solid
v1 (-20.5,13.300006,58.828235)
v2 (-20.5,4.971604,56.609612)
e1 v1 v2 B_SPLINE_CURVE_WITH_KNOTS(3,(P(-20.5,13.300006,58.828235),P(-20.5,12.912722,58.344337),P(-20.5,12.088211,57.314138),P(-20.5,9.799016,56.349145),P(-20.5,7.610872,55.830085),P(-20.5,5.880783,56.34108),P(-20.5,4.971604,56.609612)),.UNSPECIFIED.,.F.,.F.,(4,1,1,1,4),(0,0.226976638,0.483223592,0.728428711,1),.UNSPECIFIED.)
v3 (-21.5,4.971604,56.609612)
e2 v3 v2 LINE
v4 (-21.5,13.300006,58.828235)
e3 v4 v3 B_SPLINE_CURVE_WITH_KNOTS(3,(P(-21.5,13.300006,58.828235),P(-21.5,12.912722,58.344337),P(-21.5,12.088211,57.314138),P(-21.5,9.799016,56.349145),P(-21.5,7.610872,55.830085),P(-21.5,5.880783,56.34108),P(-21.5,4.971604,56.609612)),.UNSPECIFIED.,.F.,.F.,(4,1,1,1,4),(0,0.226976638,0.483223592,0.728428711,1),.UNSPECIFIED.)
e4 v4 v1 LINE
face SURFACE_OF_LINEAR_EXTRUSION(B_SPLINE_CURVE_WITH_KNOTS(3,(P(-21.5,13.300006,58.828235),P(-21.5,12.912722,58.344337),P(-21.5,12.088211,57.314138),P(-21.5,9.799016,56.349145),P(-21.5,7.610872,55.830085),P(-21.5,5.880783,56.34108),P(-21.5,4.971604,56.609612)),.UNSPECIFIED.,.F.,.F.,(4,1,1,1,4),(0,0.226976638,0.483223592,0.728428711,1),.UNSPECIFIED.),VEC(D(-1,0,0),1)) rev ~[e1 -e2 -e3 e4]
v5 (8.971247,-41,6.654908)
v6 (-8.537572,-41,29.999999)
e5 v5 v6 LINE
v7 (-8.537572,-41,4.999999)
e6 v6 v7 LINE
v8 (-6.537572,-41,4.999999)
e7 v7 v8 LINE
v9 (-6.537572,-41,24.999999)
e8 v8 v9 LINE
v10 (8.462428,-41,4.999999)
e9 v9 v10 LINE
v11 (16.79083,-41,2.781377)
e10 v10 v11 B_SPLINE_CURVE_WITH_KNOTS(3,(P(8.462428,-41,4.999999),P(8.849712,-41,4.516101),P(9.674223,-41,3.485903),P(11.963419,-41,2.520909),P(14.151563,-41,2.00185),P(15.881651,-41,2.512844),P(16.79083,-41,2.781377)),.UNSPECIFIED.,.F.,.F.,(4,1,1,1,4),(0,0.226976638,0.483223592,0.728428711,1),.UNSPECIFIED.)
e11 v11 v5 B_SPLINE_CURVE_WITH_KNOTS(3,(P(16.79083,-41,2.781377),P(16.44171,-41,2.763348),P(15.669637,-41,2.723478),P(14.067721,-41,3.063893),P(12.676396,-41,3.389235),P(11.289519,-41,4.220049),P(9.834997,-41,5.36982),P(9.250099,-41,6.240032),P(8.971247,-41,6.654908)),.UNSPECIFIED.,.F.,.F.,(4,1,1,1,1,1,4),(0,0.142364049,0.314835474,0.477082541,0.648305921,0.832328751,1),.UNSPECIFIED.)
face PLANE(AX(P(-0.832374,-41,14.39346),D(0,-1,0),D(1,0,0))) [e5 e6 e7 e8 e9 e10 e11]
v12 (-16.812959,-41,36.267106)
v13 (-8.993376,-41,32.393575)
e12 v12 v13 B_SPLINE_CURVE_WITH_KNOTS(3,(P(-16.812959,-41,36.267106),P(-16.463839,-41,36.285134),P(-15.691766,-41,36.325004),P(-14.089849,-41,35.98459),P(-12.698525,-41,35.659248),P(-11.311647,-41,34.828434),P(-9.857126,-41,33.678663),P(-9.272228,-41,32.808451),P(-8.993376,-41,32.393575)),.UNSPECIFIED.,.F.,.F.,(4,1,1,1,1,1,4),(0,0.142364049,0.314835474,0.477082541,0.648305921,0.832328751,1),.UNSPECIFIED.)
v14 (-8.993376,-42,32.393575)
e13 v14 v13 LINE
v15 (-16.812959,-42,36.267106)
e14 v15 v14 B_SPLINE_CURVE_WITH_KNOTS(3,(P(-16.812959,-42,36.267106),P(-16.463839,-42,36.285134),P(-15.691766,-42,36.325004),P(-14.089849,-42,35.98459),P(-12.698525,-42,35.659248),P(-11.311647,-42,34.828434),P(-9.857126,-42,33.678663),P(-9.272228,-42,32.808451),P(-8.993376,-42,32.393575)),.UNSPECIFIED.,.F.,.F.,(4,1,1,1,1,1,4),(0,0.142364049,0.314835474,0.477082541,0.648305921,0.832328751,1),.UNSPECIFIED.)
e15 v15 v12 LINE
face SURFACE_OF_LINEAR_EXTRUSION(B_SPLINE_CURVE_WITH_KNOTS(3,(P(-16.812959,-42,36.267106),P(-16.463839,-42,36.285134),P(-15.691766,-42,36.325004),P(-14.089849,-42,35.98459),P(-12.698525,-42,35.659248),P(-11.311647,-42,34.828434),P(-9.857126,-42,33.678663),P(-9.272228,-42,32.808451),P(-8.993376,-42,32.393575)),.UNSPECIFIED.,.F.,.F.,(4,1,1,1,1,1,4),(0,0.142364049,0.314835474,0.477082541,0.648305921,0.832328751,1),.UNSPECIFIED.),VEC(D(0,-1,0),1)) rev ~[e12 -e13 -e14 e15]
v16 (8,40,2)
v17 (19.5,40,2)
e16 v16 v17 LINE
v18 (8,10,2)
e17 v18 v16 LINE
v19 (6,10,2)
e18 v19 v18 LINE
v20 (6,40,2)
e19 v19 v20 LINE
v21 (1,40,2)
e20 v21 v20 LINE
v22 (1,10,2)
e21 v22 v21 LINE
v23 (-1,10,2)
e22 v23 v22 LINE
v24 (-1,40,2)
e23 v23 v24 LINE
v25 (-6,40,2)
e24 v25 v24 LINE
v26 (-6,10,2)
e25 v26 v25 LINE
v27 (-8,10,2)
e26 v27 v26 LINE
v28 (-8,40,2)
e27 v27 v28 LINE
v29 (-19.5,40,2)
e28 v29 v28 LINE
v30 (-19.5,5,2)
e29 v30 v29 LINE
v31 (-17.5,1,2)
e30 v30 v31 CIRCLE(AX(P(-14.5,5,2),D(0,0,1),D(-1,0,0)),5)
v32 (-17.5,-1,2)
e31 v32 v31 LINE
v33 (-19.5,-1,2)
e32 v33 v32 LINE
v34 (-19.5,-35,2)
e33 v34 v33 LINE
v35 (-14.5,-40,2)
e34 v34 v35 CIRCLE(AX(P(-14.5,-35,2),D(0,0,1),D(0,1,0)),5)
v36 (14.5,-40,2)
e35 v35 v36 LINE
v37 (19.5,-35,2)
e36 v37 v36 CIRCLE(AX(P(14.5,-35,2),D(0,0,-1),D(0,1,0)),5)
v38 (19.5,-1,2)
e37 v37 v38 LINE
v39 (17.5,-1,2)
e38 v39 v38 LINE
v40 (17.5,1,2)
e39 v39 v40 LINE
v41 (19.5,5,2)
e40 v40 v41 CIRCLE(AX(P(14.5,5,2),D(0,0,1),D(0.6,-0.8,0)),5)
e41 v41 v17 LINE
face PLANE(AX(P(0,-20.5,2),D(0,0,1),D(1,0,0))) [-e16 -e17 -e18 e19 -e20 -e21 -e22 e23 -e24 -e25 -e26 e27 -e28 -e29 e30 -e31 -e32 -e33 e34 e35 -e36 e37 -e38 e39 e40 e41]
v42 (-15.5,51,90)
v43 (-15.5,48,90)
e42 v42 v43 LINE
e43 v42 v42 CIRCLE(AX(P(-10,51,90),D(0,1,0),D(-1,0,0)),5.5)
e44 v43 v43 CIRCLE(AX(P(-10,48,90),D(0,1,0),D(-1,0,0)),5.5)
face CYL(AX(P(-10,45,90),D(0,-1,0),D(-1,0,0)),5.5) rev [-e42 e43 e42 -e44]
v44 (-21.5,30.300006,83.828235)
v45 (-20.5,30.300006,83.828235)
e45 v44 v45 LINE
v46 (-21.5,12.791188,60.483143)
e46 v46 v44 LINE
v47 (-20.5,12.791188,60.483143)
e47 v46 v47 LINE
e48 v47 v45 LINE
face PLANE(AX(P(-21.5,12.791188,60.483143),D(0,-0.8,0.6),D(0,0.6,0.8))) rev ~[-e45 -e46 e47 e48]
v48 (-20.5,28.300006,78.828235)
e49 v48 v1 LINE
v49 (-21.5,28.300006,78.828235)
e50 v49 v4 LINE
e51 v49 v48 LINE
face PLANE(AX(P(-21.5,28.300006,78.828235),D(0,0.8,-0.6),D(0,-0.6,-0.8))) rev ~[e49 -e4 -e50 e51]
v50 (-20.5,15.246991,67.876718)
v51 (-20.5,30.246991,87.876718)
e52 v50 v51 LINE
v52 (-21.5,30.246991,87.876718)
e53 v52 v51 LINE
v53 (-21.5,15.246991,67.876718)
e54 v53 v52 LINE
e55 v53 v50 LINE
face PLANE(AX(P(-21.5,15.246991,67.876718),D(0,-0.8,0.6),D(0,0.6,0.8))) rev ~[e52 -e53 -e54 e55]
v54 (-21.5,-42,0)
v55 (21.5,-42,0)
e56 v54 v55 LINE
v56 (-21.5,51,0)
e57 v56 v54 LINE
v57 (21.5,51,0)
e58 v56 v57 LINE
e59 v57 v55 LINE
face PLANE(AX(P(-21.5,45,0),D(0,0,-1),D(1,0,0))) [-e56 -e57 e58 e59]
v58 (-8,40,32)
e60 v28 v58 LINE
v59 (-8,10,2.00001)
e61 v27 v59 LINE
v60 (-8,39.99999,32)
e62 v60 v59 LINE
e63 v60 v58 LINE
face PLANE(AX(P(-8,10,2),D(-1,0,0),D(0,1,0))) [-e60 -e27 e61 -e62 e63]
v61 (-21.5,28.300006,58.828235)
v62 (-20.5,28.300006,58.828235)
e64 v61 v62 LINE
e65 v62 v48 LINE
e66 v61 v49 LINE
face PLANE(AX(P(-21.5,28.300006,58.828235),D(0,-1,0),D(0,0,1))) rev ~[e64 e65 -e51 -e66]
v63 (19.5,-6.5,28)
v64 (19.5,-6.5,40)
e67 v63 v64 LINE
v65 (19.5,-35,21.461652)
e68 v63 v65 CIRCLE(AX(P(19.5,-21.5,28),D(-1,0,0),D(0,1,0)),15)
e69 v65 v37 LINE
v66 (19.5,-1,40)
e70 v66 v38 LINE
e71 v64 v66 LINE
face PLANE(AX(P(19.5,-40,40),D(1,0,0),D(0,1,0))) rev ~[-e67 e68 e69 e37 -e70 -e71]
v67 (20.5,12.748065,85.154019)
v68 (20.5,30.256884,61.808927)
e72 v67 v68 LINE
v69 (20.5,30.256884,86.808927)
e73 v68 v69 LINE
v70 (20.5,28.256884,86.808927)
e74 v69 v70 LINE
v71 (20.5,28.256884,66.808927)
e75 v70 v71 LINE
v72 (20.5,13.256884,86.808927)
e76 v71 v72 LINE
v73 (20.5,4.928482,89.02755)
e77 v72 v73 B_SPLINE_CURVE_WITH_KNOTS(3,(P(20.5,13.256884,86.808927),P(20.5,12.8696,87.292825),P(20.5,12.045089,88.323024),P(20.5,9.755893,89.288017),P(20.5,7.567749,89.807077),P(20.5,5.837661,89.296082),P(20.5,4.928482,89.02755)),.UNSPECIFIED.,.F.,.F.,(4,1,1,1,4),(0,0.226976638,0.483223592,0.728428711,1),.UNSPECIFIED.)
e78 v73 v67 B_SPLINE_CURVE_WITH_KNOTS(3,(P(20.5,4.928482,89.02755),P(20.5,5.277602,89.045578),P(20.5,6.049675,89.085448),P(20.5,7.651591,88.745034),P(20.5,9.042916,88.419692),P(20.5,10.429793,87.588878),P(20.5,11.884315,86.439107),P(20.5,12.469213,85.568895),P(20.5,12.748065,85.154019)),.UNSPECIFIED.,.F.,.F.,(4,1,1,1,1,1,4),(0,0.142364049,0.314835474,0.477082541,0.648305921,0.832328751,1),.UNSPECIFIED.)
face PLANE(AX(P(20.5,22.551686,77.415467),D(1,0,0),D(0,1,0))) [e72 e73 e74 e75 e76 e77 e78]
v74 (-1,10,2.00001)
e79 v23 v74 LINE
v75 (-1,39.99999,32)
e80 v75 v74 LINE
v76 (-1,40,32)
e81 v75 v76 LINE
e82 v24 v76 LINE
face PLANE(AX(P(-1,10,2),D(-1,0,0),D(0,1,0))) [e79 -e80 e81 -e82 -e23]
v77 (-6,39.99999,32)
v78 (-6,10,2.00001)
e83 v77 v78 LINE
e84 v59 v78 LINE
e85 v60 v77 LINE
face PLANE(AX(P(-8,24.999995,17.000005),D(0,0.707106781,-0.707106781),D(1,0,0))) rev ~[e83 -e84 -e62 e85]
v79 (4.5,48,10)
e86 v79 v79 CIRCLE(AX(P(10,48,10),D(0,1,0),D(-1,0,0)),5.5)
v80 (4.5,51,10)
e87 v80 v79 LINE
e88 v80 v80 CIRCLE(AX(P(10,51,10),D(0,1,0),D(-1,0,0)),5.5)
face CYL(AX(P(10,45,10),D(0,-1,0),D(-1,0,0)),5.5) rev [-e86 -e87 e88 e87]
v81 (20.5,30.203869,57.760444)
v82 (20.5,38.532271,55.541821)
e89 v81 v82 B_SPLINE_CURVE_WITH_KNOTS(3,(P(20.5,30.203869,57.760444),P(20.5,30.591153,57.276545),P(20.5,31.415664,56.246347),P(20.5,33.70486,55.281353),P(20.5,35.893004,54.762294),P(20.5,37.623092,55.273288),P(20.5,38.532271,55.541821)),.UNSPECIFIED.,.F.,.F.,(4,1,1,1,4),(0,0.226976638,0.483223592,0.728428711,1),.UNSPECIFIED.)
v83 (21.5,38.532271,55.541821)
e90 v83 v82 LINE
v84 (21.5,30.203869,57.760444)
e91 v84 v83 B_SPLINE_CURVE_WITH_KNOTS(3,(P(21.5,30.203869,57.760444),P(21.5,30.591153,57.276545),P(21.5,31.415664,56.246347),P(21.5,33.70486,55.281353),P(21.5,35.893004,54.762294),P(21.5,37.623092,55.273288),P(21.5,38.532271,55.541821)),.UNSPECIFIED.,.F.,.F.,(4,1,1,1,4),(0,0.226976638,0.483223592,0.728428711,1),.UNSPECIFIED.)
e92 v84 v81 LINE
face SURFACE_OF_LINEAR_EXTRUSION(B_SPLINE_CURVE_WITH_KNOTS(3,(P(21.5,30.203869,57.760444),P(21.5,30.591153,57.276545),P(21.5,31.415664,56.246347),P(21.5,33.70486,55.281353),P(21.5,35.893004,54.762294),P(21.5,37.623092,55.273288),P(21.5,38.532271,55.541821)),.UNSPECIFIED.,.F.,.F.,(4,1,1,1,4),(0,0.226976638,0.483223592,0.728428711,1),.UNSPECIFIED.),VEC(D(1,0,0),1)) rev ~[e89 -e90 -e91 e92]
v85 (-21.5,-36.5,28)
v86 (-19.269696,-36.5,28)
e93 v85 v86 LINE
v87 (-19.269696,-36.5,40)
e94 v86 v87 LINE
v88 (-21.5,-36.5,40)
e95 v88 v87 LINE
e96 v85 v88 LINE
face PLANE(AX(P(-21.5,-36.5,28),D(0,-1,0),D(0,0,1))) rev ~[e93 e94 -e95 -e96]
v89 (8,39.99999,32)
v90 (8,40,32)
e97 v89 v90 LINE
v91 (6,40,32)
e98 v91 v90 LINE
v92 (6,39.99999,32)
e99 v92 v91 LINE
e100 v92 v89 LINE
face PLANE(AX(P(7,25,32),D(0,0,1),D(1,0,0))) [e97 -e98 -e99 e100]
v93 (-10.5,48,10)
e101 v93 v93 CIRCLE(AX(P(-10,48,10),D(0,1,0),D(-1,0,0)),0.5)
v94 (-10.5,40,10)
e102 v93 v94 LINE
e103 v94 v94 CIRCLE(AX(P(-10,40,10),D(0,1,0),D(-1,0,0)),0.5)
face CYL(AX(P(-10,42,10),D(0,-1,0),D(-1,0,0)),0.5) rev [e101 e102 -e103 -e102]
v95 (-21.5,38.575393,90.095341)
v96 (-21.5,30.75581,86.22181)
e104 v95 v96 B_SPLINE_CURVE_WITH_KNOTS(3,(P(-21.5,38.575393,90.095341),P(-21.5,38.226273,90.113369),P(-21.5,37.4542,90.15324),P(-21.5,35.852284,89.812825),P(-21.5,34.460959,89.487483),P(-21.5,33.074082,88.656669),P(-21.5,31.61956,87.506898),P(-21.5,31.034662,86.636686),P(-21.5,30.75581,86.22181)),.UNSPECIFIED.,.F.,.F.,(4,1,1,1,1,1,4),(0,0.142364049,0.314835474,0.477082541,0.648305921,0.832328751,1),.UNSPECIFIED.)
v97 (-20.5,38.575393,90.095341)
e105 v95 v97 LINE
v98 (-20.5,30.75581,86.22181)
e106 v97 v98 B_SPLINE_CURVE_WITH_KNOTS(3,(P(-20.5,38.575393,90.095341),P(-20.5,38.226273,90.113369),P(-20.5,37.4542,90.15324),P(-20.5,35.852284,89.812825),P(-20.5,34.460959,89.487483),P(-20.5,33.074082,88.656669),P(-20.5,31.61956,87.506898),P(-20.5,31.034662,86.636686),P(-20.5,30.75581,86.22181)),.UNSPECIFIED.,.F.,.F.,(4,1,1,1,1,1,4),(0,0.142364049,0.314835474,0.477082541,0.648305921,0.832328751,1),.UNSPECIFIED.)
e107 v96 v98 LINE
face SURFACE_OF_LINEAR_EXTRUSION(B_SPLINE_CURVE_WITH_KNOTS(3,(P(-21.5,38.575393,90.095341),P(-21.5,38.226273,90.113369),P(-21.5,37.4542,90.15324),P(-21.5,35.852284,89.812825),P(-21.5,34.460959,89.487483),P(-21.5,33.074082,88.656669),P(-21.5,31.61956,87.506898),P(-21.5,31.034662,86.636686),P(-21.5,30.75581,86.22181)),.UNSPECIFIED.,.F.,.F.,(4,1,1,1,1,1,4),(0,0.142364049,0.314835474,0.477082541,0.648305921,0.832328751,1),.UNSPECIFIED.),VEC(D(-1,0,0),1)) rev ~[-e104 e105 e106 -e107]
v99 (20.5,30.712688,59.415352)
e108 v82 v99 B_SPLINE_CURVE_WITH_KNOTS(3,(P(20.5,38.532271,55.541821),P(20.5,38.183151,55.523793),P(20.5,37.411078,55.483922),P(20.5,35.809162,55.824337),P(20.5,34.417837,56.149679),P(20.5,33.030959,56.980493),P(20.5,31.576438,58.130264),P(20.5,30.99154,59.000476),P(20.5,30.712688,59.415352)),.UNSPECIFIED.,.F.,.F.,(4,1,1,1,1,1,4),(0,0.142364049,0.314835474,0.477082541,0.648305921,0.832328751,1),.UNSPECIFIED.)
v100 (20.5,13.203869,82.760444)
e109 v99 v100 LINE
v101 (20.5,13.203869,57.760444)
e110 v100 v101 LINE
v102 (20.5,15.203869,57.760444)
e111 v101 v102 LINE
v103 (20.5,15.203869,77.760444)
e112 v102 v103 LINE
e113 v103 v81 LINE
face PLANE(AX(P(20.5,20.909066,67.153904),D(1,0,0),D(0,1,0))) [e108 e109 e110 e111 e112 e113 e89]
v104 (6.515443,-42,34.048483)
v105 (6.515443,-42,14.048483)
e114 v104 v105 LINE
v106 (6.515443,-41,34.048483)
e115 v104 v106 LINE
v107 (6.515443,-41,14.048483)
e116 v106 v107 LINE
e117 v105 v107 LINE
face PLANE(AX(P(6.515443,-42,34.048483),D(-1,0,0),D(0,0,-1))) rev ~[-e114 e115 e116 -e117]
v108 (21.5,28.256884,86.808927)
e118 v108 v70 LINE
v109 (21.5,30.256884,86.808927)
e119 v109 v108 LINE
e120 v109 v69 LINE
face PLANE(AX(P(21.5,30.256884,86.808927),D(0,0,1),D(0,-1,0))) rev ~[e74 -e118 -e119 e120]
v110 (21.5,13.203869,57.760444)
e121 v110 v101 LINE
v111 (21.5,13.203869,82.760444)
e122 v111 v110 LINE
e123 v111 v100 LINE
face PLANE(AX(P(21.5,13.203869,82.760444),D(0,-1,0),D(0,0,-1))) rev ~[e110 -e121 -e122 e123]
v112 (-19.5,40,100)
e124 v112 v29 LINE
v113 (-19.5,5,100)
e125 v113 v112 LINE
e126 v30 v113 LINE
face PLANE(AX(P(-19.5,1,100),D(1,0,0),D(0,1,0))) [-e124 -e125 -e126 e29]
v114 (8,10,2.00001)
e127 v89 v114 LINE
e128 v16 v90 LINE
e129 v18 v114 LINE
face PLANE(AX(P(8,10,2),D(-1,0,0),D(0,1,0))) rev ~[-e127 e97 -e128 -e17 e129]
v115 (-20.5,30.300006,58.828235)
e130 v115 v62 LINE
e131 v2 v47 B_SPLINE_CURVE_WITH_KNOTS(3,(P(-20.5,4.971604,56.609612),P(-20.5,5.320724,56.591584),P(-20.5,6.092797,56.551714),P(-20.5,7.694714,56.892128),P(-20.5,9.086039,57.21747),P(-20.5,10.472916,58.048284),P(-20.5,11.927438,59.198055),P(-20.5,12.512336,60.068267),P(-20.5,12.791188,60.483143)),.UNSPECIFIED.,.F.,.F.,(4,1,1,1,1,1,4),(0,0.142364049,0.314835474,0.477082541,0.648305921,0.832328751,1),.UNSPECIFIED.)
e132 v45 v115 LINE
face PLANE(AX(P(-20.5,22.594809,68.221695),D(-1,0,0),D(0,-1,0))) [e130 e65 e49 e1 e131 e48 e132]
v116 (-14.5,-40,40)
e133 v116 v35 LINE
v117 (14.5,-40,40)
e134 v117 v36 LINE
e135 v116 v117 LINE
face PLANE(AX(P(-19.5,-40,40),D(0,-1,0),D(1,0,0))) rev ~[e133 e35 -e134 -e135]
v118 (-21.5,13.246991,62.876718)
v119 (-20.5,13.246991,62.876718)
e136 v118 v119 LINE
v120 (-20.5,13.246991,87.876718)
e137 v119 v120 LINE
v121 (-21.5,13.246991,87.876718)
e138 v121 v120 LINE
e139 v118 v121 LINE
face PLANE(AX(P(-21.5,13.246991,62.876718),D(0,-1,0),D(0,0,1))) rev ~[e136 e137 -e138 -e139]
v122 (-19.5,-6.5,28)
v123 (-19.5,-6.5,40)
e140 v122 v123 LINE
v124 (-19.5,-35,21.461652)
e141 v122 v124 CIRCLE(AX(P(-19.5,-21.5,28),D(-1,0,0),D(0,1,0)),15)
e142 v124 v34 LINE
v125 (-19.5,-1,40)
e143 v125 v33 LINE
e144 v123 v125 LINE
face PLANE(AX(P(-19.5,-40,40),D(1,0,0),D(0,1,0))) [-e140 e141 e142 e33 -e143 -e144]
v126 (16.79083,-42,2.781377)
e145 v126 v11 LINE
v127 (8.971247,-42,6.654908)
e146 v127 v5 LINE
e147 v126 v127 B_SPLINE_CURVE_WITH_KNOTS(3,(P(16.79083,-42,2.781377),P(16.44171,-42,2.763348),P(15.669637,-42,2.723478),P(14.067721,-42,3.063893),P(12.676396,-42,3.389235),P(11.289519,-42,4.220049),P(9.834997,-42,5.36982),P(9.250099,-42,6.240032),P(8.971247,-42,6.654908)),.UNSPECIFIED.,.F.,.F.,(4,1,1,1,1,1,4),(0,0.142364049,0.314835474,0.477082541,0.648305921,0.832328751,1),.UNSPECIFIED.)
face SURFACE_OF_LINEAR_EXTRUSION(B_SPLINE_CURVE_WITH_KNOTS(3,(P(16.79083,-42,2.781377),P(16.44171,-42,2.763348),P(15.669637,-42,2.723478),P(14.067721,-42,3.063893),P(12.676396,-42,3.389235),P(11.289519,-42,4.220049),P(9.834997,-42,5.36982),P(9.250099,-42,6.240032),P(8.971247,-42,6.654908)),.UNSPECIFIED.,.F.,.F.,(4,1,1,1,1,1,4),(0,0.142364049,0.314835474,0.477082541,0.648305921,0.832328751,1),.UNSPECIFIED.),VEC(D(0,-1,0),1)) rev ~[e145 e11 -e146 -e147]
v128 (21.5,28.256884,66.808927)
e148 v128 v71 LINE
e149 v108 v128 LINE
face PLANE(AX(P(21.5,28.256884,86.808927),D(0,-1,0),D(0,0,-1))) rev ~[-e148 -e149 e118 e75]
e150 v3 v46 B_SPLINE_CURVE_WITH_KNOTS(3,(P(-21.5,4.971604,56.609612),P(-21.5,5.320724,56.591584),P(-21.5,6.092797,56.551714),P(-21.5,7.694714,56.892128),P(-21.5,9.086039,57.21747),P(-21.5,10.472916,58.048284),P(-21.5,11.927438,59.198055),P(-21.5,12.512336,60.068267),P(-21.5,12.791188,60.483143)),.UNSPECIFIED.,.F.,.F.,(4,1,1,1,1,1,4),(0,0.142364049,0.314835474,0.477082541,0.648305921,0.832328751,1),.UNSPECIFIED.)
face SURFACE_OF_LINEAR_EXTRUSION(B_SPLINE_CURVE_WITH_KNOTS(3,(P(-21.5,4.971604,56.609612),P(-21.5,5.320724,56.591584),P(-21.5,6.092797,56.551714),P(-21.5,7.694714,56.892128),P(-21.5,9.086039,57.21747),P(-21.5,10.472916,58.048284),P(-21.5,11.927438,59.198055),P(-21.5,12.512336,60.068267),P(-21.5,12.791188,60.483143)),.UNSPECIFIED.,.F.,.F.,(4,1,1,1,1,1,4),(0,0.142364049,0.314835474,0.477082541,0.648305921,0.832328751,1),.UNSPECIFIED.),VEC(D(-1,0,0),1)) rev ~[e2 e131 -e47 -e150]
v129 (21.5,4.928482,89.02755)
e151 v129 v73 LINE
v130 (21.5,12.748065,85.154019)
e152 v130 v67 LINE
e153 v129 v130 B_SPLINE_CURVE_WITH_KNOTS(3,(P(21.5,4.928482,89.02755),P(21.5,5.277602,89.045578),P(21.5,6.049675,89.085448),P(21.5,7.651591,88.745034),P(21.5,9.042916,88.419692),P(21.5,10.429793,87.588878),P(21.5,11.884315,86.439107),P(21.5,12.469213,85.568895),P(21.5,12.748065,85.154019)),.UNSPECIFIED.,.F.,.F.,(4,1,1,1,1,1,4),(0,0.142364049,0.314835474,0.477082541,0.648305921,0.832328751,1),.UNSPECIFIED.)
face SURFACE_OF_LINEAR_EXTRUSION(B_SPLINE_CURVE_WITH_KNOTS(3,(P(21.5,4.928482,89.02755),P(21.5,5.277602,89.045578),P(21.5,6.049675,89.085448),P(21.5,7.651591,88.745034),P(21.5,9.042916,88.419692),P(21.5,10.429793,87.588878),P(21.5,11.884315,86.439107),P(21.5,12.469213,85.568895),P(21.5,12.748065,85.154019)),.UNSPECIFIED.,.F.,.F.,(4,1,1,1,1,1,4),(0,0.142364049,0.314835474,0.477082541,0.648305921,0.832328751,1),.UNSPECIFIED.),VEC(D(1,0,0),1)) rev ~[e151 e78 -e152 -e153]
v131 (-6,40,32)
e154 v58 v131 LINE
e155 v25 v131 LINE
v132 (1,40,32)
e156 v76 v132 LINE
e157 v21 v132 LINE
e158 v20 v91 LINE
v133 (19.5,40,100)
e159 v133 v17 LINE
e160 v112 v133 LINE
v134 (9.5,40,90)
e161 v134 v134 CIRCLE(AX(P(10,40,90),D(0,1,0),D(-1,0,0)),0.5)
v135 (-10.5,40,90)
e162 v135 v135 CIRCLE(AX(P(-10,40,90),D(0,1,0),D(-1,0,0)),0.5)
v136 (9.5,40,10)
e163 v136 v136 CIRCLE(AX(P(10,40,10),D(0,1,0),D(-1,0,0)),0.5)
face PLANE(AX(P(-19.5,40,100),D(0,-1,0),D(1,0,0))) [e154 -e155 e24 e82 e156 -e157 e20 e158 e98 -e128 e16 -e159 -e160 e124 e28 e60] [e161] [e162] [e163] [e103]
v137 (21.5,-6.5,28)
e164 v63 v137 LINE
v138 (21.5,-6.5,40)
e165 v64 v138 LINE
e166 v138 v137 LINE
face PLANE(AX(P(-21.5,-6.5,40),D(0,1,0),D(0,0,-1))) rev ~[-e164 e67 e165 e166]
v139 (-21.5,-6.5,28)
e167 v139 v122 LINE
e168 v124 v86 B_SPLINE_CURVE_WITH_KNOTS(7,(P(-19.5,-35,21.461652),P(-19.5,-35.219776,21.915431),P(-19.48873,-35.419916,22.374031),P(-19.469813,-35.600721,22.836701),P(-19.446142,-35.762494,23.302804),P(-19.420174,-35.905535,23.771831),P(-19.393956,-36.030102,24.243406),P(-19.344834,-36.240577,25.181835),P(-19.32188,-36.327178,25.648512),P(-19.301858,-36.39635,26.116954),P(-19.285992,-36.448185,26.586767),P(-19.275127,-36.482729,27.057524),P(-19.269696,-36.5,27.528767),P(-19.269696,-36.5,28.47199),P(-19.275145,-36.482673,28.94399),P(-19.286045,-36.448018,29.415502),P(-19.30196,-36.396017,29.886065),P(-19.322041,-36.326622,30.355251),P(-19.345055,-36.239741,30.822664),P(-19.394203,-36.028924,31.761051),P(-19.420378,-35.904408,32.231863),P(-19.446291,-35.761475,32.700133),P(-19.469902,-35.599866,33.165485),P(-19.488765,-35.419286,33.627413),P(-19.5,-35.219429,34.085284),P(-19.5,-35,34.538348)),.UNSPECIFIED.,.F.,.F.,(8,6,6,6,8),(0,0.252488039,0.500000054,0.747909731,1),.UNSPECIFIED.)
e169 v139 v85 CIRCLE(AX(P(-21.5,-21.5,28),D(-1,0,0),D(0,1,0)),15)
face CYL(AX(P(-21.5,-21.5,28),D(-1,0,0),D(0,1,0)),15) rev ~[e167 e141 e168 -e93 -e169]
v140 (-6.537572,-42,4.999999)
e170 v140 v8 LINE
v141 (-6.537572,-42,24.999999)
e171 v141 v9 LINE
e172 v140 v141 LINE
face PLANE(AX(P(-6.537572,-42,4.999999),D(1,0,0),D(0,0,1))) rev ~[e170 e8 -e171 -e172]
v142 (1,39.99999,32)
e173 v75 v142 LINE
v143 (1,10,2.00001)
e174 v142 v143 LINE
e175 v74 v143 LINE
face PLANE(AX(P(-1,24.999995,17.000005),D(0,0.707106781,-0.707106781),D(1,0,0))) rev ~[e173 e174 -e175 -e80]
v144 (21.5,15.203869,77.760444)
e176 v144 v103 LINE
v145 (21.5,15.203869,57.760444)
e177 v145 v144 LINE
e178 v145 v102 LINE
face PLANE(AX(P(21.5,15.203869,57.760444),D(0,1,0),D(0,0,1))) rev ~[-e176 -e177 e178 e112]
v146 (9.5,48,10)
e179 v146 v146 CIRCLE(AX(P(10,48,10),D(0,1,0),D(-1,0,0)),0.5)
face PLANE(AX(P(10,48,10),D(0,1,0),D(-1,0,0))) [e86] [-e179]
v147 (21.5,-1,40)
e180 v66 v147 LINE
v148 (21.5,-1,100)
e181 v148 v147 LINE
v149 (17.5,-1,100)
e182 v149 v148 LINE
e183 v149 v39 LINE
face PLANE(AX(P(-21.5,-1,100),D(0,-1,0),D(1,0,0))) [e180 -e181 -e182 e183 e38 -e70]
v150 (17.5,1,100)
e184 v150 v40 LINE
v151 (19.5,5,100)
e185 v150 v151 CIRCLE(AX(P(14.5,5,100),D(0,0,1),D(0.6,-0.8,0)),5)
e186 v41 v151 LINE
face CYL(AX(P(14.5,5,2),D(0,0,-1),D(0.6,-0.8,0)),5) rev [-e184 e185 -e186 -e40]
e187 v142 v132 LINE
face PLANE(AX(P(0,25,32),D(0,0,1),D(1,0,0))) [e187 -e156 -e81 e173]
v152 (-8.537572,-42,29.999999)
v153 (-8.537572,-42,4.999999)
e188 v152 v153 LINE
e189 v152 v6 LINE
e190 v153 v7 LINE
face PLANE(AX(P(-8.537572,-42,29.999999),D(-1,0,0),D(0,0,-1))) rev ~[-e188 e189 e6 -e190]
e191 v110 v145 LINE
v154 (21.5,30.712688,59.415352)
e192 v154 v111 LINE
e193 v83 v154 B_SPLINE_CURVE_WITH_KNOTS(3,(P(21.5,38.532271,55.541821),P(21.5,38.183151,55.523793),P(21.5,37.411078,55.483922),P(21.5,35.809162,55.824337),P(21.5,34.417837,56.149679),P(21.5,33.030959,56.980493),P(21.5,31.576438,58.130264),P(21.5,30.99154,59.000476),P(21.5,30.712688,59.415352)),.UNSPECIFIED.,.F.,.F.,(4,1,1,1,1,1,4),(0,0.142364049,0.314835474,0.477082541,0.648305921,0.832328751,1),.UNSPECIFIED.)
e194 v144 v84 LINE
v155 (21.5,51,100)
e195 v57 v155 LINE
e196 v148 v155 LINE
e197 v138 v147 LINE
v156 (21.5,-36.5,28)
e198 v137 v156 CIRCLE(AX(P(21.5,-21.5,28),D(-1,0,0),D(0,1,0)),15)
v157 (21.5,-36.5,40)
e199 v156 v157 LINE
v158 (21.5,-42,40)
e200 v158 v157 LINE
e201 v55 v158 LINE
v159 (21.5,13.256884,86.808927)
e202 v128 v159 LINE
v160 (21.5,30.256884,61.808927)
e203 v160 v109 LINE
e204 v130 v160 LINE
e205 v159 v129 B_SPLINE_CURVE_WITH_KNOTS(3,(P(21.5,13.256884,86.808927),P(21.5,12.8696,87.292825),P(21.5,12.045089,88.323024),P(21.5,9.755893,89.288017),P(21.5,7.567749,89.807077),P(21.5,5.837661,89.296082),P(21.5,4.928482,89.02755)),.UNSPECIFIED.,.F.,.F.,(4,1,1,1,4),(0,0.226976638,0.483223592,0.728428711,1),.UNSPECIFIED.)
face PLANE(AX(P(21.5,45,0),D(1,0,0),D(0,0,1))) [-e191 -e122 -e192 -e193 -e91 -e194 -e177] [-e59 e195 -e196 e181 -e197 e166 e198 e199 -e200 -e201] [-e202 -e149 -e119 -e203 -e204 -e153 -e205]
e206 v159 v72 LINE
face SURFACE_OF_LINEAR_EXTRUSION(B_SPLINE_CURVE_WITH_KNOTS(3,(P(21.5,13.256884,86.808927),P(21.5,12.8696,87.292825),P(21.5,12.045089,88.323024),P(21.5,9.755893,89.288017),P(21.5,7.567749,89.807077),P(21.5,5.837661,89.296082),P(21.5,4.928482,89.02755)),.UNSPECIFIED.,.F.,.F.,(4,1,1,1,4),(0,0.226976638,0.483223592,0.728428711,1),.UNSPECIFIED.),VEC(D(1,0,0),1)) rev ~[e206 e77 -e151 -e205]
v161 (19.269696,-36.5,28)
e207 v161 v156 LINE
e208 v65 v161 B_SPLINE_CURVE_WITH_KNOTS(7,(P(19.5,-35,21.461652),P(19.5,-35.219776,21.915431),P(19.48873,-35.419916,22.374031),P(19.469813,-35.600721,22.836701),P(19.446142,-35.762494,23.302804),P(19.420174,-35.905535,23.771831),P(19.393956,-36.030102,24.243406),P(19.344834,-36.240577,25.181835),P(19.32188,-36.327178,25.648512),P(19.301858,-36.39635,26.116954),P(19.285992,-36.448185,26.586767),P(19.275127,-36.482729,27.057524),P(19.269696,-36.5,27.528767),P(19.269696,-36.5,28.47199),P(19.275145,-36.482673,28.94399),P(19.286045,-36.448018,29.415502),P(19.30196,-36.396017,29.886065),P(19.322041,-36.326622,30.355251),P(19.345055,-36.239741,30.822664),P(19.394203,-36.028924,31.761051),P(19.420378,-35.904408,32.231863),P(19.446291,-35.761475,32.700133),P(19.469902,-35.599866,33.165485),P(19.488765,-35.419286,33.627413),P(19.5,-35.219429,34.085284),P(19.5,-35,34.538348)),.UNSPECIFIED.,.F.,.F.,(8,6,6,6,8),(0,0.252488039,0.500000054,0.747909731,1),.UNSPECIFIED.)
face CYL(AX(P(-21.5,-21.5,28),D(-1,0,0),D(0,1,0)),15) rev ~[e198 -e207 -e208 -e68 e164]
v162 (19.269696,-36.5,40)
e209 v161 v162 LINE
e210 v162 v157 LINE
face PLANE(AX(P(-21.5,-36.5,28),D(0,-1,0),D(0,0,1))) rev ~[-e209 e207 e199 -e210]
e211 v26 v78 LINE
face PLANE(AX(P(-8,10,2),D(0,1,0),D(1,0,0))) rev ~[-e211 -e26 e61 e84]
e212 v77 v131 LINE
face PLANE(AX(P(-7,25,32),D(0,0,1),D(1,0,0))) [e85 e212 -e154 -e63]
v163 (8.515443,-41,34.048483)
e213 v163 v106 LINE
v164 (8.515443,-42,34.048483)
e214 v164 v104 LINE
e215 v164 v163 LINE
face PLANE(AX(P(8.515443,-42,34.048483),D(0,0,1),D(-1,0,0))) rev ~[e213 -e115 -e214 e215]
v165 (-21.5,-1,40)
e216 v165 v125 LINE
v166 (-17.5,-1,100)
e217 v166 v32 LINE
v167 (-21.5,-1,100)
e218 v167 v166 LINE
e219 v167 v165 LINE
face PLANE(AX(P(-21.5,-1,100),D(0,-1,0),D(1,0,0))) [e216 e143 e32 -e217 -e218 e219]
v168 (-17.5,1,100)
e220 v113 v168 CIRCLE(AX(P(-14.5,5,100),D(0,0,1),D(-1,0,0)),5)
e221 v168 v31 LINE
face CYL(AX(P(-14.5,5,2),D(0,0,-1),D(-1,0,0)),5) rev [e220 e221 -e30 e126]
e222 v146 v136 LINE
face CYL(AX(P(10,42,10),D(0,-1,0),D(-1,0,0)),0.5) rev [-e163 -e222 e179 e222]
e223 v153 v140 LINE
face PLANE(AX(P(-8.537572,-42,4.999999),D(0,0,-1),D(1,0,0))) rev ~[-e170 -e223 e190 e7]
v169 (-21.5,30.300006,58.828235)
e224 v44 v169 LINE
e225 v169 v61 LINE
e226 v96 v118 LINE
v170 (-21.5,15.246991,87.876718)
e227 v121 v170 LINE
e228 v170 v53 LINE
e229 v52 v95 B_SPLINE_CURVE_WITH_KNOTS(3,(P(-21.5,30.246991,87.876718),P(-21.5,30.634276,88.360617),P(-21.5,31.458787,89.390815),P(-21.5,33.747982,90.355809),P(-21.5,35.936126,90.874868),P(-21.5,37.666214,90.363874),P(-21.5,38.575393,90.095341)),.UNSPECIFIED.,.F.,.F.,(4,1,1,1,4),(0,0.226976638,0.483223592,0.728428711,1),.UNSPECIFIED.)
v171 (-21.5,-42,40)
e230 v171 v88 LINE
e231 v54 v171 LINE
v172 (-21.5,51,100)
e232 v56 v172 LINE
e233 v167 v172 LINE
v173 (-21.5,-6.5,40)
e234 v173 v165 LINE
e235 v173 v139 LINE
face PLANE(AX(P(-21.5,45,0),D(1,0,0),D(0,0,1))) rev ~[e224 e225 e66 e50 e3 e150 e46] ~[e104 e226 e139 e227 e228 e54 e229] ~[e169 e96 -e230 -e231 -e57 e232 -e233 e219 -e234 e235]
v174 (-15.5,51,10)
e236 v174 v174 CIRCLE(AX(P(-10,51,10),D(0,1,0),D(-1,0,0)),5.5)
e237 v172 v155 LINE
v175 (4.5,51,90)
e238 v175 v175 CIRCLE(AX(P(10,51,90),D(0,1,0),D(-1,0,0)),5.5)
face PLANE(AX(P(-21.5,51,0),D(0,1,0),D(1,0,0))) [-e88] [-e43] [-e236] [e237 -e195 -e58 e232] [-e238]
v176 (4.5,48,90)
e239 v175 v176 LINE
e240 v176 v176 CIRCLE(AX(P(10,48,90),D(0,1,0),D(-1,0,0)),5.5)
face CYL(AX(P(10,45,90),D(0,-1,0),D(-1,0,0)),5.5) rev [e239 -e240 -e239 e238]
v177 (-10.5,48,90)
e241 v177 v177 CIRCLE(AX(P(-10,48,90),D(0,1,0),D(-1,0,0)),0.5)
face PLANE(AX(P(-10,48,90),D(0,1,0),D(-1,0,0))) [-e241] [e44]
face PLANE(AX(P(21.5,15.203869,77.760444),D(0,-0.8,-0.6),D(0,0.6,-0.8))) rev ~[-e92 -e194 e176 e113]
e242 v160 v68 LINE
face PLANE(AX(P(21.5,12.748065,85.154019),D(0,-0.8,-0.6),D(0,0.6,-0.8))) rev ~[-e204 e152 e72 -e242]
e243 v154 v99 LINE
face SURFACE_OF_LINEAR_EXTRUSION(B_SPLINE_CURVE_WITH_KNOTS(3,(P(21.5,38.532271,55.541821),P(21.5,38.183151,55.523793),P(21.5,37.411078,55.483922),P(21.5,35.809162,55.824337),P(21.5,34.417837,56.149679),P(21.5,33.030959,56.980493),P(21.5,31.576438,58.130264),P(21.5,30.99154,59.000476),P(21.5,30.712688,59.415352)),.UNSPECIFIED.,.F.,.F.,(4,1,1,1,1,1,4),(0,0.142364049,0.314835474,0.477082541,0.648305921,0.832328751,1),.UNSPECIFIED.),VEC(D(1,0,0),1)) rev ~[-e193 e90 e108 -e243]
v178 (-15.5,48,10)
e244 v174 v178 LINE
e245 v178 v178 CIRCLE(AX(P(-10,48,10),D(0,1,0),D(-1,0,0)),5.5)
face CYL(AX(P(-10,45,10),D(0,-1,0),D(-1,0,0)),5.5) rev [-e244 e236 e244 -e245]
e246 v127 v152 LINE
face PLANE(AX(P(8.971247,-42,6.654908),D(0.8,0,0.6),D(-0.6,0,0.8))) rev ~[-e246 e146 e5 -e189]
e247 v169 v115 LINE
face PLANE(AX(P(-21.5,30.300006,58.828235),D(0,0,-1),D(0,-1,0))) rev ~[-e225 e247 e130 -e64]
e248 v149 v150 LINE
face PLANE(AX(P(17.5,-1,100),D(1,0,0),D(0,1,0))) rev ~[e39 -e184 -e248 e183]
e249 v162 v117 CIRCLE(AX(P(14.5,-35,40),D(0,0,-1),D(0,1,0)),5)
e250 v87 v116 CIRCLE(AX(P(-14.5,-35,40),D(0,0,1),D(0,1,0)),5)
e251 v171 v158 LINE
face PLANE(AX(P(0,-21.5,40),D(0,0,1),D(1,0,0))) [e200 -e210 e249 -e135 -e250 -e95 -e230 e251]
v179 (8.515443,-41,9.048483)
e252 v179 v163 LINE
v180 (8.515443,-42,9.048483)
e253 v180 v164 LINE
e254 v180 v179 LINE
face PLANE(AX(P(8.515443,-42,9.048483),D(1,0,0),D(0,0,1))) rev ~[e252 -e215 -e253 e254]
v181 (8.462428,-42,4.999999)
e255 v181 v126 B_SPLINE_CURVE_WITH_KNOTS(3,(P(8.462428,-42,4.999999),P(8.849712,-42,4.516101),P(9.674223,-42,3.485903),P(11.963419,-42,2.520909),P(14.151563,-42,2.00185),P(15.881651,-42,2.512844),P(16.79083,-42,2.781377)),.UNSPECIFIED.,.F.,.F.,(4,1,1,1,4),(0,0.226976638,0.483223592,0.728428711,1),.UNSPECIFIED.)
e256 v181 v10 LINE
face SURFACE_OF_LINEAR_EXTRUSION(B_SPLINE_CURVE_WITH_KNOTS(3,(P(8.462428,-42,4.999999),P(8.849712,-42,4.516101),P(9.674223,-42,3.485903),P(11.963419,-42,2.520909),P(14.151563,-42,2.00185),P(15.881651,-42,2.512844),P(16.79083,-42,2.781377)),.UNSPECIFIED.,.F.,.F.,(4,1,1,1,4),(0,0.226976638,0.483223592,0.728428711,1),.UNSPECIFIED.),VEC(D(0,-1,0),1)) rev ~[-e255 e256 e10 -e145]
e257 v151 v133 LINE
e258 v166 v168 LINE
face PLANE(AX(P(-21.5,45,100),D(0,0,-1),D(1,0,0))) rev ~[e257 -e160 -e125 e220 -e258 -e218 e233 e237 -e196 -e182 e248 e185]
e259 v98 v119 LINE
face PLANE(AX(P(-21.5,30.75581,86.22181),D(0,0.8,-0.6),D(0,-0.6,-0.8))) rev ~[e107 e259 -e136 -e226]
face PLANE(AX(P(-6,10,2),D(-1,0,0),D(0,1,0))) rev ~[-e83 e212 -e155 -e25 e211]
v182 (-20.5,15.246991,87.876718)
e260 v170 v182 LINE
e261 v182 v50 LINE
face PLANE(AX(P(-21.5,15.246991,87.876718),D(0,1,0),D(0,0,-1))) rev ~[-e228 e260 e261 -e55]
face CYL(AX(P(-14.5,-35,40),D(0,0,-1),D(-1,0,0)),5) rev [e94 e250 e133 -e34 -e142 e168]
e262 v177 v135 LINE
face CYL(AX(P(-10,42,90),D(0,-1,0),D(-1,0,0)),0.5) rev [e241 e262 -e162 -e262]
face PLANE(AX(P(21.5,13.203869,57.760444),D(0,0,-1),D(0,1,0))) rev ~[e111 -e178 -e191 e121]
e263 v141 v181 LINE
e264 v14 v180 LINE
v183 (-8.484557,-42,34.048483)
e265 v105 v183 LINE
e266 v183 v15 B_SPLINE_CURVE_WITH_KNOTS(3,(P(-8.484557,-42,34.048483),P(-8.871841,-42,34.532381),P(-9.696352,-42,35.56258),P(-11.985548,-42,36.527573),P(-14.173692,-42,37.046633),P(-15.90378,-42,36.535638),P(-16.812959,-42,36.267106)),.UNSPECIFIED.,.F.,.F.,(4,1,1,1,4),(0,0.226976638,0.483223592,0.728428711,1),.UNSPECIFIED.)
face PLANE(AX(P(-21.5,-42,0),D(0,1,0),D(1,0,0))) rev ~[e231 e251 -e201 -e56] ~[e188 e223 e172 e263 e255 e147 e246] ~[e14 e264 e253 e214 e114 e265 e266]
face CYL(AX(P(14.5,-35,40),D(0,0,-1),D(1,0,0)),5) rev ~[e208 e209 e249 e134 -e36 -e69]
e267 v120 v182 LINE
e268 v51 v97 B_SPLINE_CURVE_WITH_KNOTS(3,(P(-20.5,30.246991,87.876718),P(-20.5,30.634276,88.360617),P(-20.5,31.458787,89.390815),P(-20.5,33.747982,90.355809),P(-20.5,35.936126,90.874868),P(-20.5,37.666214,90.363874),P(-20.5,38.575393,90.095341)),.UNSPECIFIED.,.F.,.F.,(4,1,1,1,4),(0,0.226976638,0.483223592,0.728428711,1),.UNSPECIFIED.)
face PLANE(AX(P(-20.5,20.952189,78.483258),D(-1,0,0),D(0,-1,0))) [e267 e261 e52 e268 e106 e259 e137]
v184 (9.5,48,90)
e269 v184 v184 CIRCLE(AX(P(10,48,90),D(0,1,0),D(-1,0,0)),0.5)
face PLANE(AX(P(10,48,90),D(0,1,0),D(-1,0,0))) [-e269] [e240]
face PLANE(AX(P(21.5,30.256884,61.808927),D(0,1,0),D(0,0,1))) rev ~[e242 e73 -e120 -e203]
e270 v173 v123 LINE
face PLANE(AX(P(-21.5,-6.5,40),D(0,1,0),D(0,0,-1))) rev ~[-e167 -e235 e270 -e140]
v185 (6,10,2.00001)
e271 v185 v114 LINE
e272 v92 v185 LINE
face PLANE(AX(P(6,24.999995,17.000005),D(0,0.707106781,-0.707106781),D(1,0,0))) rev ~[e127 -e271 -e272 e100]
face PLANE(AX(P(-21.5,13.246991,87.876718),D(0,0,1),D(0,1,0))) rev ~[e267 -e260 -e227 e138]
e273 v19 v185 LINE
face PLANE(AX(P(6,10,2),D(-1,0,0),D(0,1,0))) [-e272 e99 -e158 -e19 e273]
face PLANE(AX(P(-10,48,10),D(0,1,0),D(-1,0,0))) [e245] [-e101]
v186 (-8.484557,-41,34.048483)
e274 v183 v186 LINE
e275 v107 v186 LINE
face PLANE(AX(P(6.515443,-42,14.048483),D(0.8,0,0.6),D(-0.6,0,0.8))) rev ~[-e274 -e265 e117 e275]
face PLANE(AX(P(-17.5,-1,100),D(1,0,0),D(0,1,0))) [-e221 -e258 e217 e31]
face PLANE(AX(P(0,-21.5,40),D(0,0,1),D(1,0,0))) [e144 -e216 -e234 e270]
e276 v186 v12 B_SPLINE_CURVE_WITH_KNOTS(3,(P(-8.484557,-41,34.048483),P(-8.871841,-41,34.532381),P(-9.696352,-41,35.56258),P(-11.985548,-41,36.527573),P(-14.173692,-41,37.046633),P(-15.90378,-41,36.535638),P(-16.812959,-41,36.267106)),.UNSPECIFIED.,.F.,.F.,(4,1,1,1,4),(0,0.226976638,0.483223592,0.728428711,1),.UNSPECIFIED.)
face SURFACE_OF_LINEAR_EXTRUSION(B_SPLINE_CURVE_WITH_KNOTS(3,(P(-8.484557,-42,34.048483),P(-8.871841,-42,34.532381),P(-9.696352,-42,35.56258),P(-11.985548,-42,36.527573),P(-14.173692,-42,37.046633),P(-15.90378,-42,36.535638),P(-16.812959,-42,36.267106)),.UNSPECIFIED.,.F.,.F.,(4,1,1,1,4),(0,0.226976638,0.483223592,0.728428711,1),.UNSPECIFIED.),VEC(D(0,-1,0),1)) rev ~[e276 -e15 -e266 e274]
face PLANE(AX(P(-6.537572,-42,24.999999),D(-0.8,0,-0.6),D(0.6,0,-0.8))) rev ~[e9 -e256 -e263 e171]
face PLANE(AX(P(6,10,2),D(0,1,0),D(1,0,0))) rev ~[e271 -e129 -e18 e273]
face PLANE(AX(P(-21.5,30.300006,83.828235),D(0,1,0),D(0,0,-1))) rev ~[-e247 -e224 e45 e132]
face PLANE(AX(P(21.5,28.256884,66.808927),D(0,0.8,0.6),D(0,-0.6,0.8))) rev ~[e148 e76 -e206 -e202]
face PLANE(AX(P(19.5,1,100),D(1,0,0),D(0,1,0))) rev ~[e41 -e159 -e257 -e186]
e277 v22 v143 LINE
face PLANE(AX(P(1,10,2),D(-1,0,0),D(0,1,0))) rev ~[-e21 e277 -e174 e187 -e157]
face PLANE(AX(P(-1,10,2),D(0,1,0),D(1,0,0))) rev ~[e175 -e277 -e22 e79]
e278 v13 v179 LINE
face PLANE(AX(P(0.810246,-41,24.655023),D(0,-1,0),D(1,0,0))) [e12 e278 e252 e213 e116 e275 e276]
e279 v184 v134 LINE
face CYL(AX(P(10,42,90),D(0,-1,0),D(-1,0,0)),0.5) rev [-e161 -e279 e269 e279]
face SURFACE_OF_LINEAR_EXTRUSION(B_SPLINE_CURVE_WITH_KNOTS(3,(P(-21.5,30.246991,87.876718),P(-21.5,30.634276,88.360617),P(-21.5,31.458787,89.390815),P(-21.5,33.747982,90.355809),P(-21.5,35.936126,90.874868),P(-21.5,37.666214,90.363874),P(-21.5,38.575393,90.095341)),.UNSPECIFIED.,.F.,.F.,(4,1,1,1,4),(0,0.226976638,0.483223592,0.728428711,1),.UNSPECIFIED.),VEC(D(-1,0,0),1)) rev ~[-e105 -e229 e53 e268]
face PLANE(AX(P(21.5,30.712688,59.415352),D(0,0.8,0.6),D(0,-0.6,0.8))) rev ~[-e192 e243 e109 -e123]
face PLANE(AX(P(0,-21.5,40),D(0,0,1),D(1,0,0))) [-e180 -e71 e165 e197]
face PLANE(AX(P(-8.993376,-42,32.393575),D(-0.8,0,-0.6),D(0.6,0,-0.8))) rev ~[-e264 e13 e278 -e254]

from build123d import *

# Parameters (mm, degrees)
F0_W         = 43
F0_H         = 84
F1_DEPTH     = 100
F2_W         = 43
F2_H         = 41
F3_DEPTH     = 60
F4_W         = 39
F4_H         = 39
F5_DEPTH     = 38
F6_W         = 39
F6_H         = 39
F7_DEPTH     = 98
F8_W         = 35
F8_H         = 2
F9_DEPTH     = 98
F10_T1_DEPTH = 98
F12_DEPTH    = 43
F13_R        = 5
F14_DEPTH    = 3
F15_R        = 5.5
F16_DEPTH    = 3
F17_W        = 2
F17_H        = 30
F18_DEPTH    = 30
F19_SIZE     = 29.99999
F21_DEPTH    = 1
F23_DEPTH    = 1
F25_DEPTH    = 1
F26_R        = 0.5
F27_DEPTH    = 2
F28_R        = 0.5
F29_DEPTH    = 2
F30_DEPTH    = 6
F31_DEPTH    = 6
F32_DEPTH    = 6
F33_R        = 0.5
F34_DEPTH    = 2
F35_R        = 0.5
F36_DEPTH    = 2
F37_DEPTH    = 6
F38_DEPTH    = 6


# Not quite as in the source:
# - a fillet or chamfer that OpenCascade refuses, or shapes differently, is made with other operations: its cross-section is extruded or revolved along the edge and cut away or added
# - a fillet or chamfer is up to 0.001 mm smaller than in the source, because OpenCascade refuses the exact size


with BuildPart() as f1:
    # F0 (on Top) → F1 (new body)
    with BuildSketch(Plane.XY):
        Rectangle(F0_W, F0_H)
    extrude(amount=F1_DEPTH)

    # F2 (on face) → F3 (cut)
    with BuildSketch(Plane.XY.offset(100)):
        with Locations((0, -21.5)):
            Rectangle(F2_W, F2_H)
    extrude(amount=-F3_DEPTH, mode=Mode.SUBTRACT)

    # F4 (on face) → F5 (cut)
    with BuildSketch(Plane.XY.offset(40)):
        with Locations((0, -20.5)):
            Rectangle(F4_W, F4_H)
    extrude(amount=-F5_DEPTH, mode=Mode.SUBTRACT)

    # F6 (on face) → F7 (cut)
    with BuildSketch(Plane.XY.offset(100)):
        with Locations((0, 20.5)):
            Rectangle(F6_W, F6_H)
    extrude(amount=-F7_DEPTH, mode=Mode.SUBTRACT)

    # F8 (on face) → F9 (cut)
    with BuildSketch(Plane.XY.offset(100)):
        Rectangle(F8_W, F8_H)
    extrude(amount=-F9_DEPTH, mode=Mode.SUBTRACT)

    # F10: fillet of radius 5 on 2 edges, made by hand

    # F10_s2 → F10_t1 (join)
    with BuildSketch(Plane.XY.offset(2)):
        with BuildLine():
            ThreePointArc((-19.5, 5), (-18.972135955, 2.7639320225), (-17.5, 1))
            Line((-17.5, 1), (-19.5, 1))
            Line((-19.5, 1), (-19.5, 5))
        make_face()
        with BuildLine():
            ThreePointArc((17.5, 1), (18.972135955, 2.7639320225), (19.5, 5))
            Line((19.5, 5), (19.5, 1))
            Line((19.5, 1), (17.5, 1))
        make_face()
    extrude(amount=F10_T1_DEPTH)

    # F11 (on face) → F12 (cut)
    with BuildSketch(Plane(origin=(-21.5, 0, 0), x_dir=(0, -1, 0), z_dir=(-1, 0, 0))):
        with BuildLine():
            Line((6.5, 40), (6.5, 28))
            ThreePointArc((6.5, 28), (21.5, 13), (36.5, 28))
            Line((36.5, 28), (36.5, 40))
            Line((36.5, 40), (6.5, 40))
        make_face()
    extrude(amount=-F12_DEPTH, mode=Mode.SUBTRACT)

    # F13
    f13_edges = [f1.edges().sort_by_distance(p)[0] for p in [
        (-19.5, -40, 21),
        (19.5, -40, 21),
    ]]
    fillet(f13_edges, radius=F13_R)

    # F14 (add): a face of the model
    f14_faces = [f1.faces().sort_by_distance(p)[0] for p in [
        (0, 42, 50),
    ]]
    extrude(f14_faces, amount=F14_DEPTH)

    # F15 (on face) → F16 (cut)
    with BuildSketch(Plane(origin=(0, 45, 0), x_dir=(-1, 0, 0), z_dir=(0, 1, 0))):
        with Locations((10, 90)):
            Circle(F15_R)
        with Locations((-10, 90)):
            Circle(F15_R)
        with Locations((-10, 10)):
            Circle(F15_R)
        with Locations((10, 10)):
            Circle(F15_R)
    extrude(amount=-F16_DEPTH, mode=Mode.SUBTRACT)

    # F17 (on face) → F18 (join)
    with BuildSketch(Plane.XY.offset(2)):
        with Locations((0, 25)):
            Rectangle(F17_W, F17_H)
        with Locations((7, 25)):
            Rectangle(F17_W, F17_H)
        with Locations((-7, 25)):
            Rectangle(F17_W, F17_H)
    extrude(amount=F18_DEPTH)

    # F19 (size 30 in the source; OpenCascade refuses exactly that, so slightly less here)
    f19_edges = [f1.edges().sort_by_distance(p)[0] for p in [
        (-7, 10, 32),
        (0, 10, 32),
        (7, 10, 32),
    ]]
    chamfer(f19_edges, length=F19_SIZE)

    # F20 (on face) → F21 (cut)
    with BuildSketch(Plane.YZ.offset(21.5)):
        with BuildLine():
            Line((30.7126875989, 59.4153521478), (13.203869056, 82.7604435384))
            Line((13.203869056, 82.7604435384), (13.203869056, 57.7604435384))
            Line((13.203869056, 57.7604435384), (15.203869056, 57.7604435384))
            Line((15.203869056, 57.7604435384), (15.203869056, 77.7604435384))
            Line((15.203869056, 77.7604435384), (30.203869056, 57.7604435384))
            add(Edge.make_bspline(
                [(30.203869056, 57.7604435384), (30.5911530821, 57.276545428), (31.4156642738, 56.2463469671), (33.7048595404, 55.2813534719), (35.8930037718, 54.7622938939), (37.6230920038, 55.2732884025), (38.5322710667, 55.5418212437)],
                knots=[0, 0, 0, 0, 0.2269766379, 0.4832235918, 0.7284287114, 1, 1, 1, 1], degree=3))
            add(Edge.make_bspline(
                [(38.5322710667, 55.5418212437), (38.1831508623, 55.5237925594), (37.4110779588, 55.4839224558), (35.8091615291, 55.8243371923), (34.4178365647, 56.1496791023), (33.0309594623, 56.9804929726), (31.5764378105, 58.1302638948), (30.9915396307, 59.0004758727), (30.7126875989, 59.4153521478)],
                knots=[0, 0, 0, 0, 0.1423640494, 0.3148354738, 0.477082541, 0.6483059214, 0.8323287509, 1, 1, 1, 1], degree=3))
        make_face()
        with BuildLine():
            Line((12.7480653018, 85.1540187478), (30.2568838447, 61.8089273572))
            Line((30.2568838447, 61.8089273572), (30.2568838447, 86.8089273572))
            Line((30.2568838447, 86.8089273572), (28.2568838447, 86.8089273572))
            Line((28.2568838447, 86.8089273572), (28.2568838447, 66.8089273572))
            Line((28.2568838447, 66.8089273572), (13.2568838447, 86.8089273572))
            add(Edge.make_bspline(
                [(13.2568838447, 86.8089273572), (12.8695998186, 87.2928254676), (12.0450886269, 88.3230239285), (9.7558933603, 89.2880174237), (7.5677491289, 89.8070770017), (5.8376608969, 89.2960824931), (4.928481834, 89.0275496519)],
                knots=[0, 0, 0, 0, 0.2269766379, 0.4832235918, 0.7284287114, 1, 1, 1, 1], degree=3))
            add(Edge.make_bspline(
                [(4.928481834, 89.0275496519), (5.2776020384, 89.0455783363), (6.0496749419, 89.0854484398), (7.6515913716, 88.7450337033), (9.042916336, 88.4196917933), (10.4297934384, 87.5888779231), (11.8843150902, 86.4391070008), (12.46921327, 85.5688950229), (12.7480653018, 85.1540187478)],
                knots=[0, 0, 0, 0, 0.1423640494, 0.3148354738, 0.477082541, 0.6483059214, 0.8323287509, 1, 1, 1, 1], degree=3))
        make_face()
    extrude(amount=-F21_DEPTH, mode=Mode.SUBTRACT)

    # F22 (on face) → F23 (cut)
    with BuildSketch(Plane(origin=(-21.5, 0, 0), x_dir=(0, -1, 0), z_dir=(-1, 0, 0))):
        with BuildLine():
            Line((-12.7911877275, 60.483143282), (-30.3000062704, 83.8282346725))
            Line((-30.3000062704, 83.8282346725), (-30.3000062704, 58.8282346725))
            Line((-30.3000062704, 58.8282346725), (-28.3000062704, 58.8282346725))
            Line((-28.3000062704, 58.8282346725), (-28.3000062704, 78.8282346725))
            Line((-28.3000062704, 78.8282346725), (-13.3000062704, 58.8282346725))
            add(Edge.make_bspline(
                [(-13.3000062704, 58.8282346725), (-12.9127222442, 58.3443365621), (-12.0882110526, 57.3141381012), (-9.799015786, 56.349144606), (-7.6108715546, 55.830085028), (-5.8807833225, 56.3410795367), (-4.9716042597, 56.6096123778)],
                knots=[0, 0, 0, 0, 0.2269766379, 0.4832235918, 0.7284287114, 1, 1, 1, 1], degree=3))
            add(Edge.make_bspline(
                [(-4.9716042597, 56.6096123778), (-5.320724464, 56.5915836935), (-6.0927973675, 56.5517135899), (-7.6947137972, 56.8921283264), (-9.0860387617, 57.2174702364), (-10.4729158641, 58.0482841067), (-11.9274375159, 59.1980550289), (-12.5123356957, 60.0682670068), (-12.7911877275, 60.483143282)],
                knots=[0, 0, 0, 0, 0.1423640494, 0.3148354738, 0.477082541, 0.6483059214, 0.8323287509, 1, 1, 1, 1], degree=3))
        make_face()
        with BuildLine():
            Line((-30.7558100246, 86.2218098819), (-13.2469914816, 62.8767184913))
            Line((-13.2469914816, 62.8767184913), (-13.2469914816, 87.8767184913))
            Line((-13.2469914816, 87.8767184913), (-15.2469914816, 87.8767184913))
            Line((-15.2469914816, 87.8767184913), (-15.2469914816, 67.8767184913))
            Line((-15.2469914816, 67.8767184913), (-30.2469914816, 87.8767184913))
            add(Edge.make_bspline(
                [(-30.2469914816, 87.8767184913), (-30.6342755078, 88.3606166017), (-31.4587866995, 89.3908150626), (-33.747981966, 90.3558085578), (-35.9361261975, 90.8748681358), (-37.6662144295, 90.3638736272), (-38.5753934924, 90.095340786)],
                knots=[0, 0, 0, 0, 0.2269766379, 0.4832235918, 0.7284287114, 1, 1, 1, 1], degree=3))
            add(Edge.make_bspline(
                [(-38.5753934924, 90.095340786), (-38.226273288, 90.1133694704), (-37.4542003845, 90.1532395739), (-35.8522839548, 89.8128248375), (-34.4609589904, 89.4874829274), (-33.074081888, 88.6566690572), (-31.6195602362, 87.5068981349), (-31.0346620564, 86.636686157), (-30.7558100246, 86.2218098819)],
                knots=[0, 0, 0, 0, 0.1423640494, 0.3148354738, 0.477082541, 0.6483059214, 0.8323287509, 1, 1, 1, 1], degree=3))
        make_face()
    extrude(amount=-F23_DEPTH, mode=Mode.SUBTRACT)

    # F24 (on face) → F25 (cut)
    with BuildSketch(Plane.XZ.offset(42)):
        with BuildLine():
            Line((8.9712467361, 6.654908032), (-8.5375718068, 29.9999994226))
            Line((-8.5375718068, 29.9999994226), (-8.5375718068, 4.9999994226))
            Line((-8.5375718068, 4.9999994226), (-6.5375718068, 4.9999994226))
            Line((-6.5375718068, 4.9999994226), (-6.5375718068, 24.9999994226))
            Line((-6.5375718068, 24.9999994226), (8.4624281932, 4.9999994226))
            add(Edge.make_bspline(
                [(8.4624281932, 4.9999994226), (8.8497122193, 4.5161013121), (9.674223411, 3.4859028513), (11.9634186776, 2.5209093561), (14.151562909, 2.0018497781), (15.8816511411, 2.5128442867), (16.7908302039, 2.7813771279)],
                knots=[0, 0, 0, 0, 0.2269766379, 0.4832235918, 0.7284287114, 1, 1, 1, 1], degree=3))
            add(Edge.make_bspline(
                [(16.7908302039, 2.7813771279), (16.4417099996, 2.7633484435), (15.669637096, 2.72347834), (14.0677206663, 3.0638930764), (12.6763957019, 3.3892349865), (11.2895185995, 4.2200488567), (9.8349969477, 5.369819779), (9.2500987679, 6.2400317569), (8.9712467361, 6.654908032)],
                knots=[0, 0, 0, 0, 0.1423640494, 0.3148354738, 0.477082541, 0.6483059214, 0.8323287509, 1, 1, 1, 1], degree=3))
        make_face()
        with BuildLine():
            Line((-8.993375561, 32.3935746319), (8.515442982, 9.0484832413))
            Line((8.515442982, 9.0484832413), (8.515442982, 34.0484832413))
            Line((8.515442982, 34.0484832413), (6.515442982, 34.0484832413))
            Line((6.515442982, 34.0484832413), (6.515442982, 14.0484832413))
            Line((6.515442982, 14.0484832413), (-8.484557018, 34.0484832413))
            add(Edge.make_bspline(
                [(-8.484557018, 34.0484832413), (-8.8718410442, 34.5323813518), (-9.6963522359, 35.5625798127), (-11.9855475024, 36.5275733078), (-14.1736917339, 37.0466328859), (-15.9037799659, 36.5356383772), (-16.8129590288, 36.267105536)],
                knots=[0, 0, 0, 0, 0.2269766379, 0.4832235918, 0.7284287114, 1, 1, 1, 1], degree=3))
            add(Edge.make_bspline(
                [(-16.8129590288, 36.267105536), (-16.4638388244, 36.2851342204), (-15.6917659209, 36.325004324), (-14.0898494912, 35.9845895875), (-12.6985245268, 35.6592476775), (-11.3116474244, 34.8284338072), (-9.8571257726, 33.678662885), (-9.2722275928, 32.808450907), (-8.993375561, 32.3935746319)],
                knots=[0, 0, 0, 0, 0.1423640494, 0.3148354738, 0.477082541, 0.6483059214, 0.8323287509, 1, 1, 1, 1], degree=3))
        make_face()
    extrude(amount=-F25_DEPTH, mode=Mode.SUBTRACT)

    # F26 (on face) → F27 (cut)
    with BuildSketch(Plane(origin=(0, 42, 0), x_dir=(-1, 0, 0), z_dir=(0, 1, 0))):
        with Locations((-10, 90)):
            Circle(F26_R)
    extrude(amount=-F27_DEPTH, mode=Mode.SUBTRACT)

    # F28 (on face) → F29 (cut)
    with BuildSketch(Plane(origin=(0, 42, 0), x_dir=(-1, 0, 0), z_dir=(0, 1, 0))):
        with Locations((10, 90)):
            Circle(F28_R)
    extrude(amount=-F29_DEPTH, mode=Mode.SUBTRACT)

    # F30 (add): a face of the model
    f30_faces = [f1.faces().sort_by_distance(p)[0] for p in [
        (0, 45, 50),
    ]]
    extrude(f30_faces, amount=F30_DEPTH)

    # F31 (add): a face of the model
    f31_faces = [f1.faces().sort_by_distance(p)[0] for p in [
        (15.3444365081, 42, 90),
    ]]
    extrude(f31_faces, amount=F31_DEPTH)

    # F32 (add): a face of the model
    f32_faces = [f1.faces().sort_by_distance(p)[0] for p in [
        (-4.6555634919, 42, 90),
    ]]
    extrude(f32_faces, amount=F32_DEPTH)

    # F33 (on face) → F34 (cut)
    with BuildSketch(Plane(origin=(0, 42, 0), x_dir=(-1, 0, 0), z_dir=(0, 1, 0))):
        with Locations((-10, 10)):
            Circle(F33_R)
    extrude(amount=-F34_DEPTH, mode=Mode.SUBTRACT)

    # F35 (on face) → F36 (cut)
    with BuildSketch(Plane(origin=(0, 42, 0), x_dir=(-1, 0, 0), z_dir=(0, 1, 0))):
        with Locations((10, 10)):
            Circle(F35_R)
    extrude(amount=-F36_DEPTH, mode=Mode.SUBTRACT)

    # F37 (add): a face of the model
    f37_faces = [f1.faces().sort_by_distance(p)[0] for p in [
        (15.3444365081, 42, 10),
    ]]
    extrude(f37_faces, amount=F37_DEPTH)

    # F38 (add): a face of the model
    f38_faces = [f1.faces().sort_by_distance(p)[0] for p in [
        (-4.6555634919, 42, 10),
    ]]
    extrude(f38_faces, amount=F38_DEPTH)


solid = f1.part
